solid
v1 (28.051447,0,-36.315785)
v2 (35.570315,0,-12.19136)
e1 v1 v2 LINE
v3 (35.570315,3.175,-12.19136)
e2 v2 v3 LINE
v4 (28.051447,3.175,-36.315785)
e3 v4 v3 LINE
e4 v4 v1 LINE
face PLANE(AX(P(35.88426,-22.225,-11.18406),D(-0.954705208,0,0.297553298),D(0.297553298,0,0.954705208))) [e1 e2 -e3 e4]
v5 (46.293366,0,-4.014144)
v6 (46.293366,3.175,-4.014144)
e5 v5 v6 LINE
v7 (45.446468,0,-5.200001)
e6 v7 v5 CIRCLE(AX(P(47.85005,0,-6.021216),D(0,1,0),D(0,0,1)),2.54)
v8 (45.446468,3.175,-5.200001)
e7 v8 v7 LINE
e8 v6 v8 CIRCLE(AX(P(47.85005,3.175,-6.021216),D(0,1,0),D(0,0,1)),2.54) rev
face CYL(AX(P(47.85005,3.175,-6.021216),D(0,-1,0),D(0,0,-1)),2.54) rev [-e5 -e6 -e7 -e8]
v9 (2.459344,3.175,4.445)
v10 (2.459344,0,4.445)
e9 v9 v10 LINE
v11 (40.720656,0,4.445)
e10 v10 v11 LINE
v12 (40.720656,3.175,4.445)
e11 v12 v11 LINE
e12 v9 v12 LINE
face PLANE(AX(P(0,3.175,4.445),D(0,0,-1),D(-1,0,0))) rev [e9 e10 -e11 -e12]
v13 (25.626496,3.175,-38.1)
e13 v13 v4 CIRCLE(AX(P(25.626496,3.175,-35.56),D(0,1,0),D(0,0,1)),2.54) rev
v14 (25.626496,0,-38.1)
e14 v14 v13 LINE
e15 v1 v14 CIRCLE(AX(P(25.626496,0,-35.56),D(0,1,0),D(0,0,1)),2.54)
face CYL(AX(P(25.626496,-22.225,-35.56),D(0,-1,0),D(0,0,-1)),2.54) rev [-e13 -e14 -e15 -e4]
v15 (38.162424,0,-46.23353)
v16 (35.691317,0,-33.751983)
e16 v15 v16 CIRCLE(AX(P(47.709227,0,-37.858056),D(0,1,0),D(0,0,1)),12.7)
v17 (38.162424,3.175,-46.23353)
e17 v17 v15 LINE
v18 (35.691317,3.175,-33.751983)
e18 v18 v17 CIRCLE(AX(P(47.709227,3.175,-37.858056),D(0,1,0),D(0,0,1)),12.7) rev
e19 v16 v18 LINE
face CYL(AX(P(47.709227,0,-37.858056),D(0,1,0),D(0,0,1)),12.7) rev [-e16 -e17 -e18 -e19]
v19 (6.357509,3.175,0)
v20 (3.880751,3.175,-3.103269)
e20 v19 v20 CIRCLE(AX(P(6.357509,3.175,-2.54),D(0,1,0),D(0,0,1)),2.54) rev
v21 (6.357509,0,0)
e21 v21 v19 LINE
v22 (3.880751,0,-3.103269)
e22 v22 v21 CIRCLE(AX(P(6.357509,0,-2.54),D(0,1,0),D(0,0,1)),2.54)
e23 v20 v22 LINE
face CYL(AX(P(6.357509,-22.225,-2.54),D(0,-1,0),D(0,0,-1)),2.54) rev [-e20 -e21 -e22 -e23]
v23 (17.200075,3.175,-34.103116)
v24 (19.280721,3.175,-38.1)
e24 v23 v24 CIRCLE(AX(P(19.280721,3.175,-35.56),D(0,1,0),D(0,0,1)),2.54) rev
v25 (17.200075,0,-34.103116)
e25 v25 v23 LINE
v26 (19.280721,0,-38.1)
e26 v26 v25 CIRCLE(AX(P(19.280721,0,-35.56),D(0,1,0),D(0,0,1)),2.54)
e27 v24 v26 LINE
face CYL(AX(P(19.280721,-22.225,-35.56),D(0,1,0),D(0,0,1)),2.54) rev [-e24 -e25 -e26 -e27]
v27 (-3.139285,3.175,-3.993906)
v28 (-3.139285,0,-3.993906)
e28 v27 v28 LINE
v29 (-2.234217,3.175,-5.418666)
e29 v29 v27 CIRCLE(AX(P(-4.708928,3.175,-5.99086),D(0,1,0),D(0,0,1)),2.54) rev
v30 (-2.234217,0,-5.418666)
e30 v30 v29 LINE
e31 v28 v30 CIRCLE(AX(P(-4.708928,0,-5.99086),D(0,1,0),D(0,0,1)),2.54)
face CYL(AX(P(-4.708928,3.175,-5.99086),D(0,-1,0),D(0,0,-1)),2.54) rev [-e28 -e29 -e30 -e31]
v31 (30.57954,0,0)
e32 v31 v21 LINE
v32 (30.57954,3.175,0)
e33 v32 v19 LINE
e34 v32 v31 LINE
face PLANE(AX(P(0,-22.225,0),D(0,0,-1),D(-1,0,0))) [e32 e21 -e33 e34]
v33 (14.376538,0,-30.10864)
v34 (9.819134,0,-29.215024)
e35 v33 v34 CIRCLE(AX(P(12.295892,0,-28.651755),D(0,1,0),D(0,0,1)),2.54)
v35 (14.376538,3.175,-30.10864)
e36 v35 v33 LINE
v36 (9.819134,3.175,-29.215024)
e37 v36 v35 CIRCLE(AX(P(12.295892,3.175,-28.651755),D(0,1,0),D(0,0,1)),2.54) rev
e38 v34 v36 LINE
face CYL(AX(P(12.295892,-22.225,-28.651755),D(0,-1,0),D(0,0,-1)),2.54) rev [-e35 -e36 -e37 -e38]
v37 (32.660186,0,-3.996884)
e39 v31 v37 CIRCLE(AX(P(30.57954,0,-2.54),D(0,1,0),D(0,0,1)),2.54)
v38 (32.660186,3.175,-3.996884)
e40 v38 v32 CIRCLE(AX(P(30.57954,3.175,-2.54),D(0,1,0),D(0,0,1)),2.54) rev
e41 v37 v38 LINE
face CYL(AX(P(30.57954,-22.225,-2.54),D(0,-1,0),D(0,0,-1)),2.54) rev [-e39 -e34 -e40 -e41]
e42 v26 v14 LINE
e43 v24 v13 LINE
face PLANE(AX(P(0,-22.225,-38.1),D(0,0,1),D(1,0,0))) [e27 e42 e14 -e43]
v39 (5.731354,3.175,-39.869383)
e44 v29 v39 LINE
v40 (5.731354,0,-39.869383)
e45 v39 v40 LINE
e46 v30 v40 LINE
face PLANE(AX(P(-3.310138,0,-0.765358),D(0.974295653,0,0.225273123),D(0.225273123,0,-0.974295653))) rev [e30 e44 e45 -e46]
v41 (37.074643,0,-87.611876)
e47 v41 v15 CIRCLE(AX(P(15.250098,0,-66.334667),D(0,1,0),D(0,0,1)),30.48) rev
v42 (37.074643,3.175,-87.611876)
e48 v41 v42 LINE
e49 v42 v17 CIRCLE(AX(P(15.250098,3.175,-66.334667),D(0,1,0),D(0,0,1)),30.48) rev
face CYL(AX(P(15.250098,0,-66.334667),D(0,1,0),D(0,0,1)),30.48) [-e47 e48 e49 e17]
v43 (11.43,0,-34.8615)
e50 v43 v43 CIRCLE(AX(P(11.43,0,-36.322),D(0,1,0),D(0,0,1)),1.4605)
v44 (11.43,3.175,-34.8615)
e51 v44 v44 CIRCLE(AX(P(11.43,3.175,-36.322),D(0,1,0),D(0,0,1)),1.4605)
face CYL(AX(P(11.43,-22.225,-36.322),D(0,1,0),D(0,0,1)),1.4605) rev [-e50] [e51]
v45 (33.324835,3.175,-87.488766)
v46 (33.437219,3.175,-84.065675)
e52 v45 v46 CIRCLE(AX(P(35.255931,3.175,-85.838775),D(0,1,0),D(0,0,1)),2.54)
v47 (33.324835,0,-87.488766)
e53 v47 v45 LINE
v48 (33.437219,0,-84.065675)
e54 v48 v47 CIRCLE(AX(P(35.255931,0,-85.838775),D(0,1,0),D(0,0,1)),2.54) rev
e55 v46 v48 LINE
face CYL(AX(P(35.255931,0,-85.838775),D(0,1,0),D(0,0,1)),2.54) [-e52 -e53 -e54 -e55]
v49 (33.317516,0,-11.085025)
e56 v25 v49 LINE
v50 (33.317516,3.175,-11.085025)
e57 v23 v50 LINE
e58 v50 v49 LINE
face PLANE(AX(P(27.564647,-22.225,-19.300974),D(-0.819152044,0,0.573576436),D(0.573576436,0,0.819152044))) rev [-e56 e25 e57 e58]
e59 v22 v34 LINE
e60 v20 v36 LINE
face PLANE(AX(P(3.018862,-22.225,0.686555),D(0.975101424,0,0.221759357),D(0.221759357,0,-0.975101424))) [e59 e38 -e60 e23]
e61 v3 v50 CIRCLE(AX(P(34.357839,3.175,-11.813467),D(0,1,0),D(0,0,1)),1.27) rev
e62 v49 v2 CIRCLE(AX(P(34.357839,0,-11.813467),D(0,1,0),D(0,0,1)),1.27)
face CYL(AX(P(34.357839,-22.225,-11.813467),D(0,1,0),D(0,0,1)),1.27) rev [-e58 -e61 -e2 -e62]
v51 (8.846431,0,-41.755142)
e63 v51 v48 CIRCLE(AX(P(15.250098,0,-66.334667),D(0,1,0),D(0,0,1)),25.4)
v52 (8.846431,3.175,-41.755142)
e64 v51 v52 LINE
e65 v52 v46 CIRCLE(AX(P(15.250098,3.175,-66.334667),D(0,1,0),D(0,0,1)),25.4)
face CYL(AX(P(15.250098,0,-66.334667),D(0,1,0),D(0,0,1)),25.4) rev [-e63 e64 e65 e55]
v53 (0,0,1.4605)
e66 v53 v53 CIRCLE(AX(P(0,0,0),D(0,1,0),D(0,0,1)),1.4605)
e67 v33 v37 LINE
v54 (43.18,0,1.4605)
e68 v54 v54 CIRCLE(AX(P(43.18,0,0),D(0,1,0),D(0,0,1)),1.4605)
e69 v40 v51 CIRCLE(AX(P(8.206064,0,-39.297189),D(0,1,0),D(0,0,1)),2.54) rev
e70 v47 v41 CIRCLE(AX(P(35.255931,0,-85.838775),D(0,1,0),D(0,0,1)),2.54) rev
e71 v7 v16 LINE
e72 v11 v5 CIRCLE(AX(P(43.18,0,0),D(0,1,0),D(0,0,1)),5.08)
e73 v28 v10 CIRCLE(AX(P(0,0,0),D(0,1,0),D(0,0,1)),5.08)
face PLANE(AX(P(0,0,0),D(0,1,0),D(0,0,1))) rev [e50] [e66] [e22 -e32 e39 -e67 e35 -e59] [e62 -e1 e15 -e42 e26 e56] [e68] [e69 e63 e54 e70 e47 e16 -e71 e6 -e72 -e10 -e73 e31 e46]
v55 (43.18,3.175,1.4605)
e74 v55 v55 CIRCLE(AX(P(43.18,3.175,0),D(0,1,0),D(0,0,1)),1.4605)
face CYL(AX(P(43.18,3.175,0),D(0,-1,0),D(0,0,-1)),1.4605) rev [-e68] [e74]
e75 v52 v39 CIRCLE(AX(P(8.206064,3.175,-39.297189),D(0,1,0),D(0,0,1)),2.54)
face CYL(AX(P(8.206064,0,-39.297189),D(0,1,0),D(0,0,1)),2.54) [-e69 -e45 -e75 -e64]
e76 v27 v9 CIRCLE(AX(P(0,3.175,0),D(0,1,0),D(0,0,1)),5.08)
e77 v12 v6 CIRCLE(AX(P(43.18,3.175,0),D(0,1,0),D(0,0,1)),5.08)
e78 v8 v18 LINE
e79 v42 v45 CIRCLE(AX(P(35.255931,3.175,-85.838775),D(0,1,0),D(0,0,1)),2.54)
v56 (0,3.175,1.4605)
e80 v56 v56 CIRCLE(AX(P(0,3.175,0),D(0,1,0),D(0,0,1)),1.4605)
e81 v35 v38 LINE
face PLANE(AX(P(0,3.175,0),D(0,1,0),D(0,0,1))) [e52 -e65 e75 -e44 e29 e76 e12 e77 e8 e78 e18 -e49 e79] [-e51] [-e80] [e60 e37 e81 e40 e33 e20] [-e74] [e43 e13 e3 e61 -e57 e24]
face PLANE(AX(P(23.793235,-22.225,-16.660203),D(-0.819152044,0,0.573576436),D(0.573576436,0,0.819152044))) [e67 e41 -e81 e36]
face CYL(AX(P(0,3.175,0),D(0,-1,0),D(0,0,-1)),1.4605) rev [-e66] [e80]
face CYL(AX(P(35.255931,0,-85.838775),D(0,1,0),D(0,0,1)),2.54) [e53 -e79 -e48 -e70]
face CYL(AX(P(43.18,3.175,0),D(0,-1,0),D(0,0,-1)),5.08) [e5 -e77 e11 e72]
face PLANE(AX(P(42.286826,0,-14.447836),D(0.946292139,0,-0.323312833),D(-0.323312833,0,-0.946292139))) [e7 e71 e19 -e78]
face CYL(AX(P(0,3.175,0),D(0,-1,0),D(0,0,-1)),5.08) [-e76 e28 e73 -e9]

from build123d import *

# Parameters (mm, degrees)
SKETCH1_R           = 5.08
SKETCH1_R_2         = 1.4605
BOSS_EXTRUDE1_DEPTH = 3.175
BOSS_EXTRUDE3_START = -3.175
BOSS_EXTRUDE3_DEPTH = 3.175
CUT_EXTRUDE1_DEPTH  = 25.4
FILLET4_R           = 2.54
FILLET5_R           = 12.7
FILLET6_R           = 2.54
FILLET7_R           = 1.27
SKETCH5_R           = 1.4605
CUT_EXTRUDE2_DEPTH  = 25.4


with BuildPart() as part:
    # Sketch1 → Boss-Extrude1 (new body)
    # profile 1 of 3: a face of its own
    with BuildSketch(Plane(origin=(0, 0, 0), x_dir=(1, 0, 0), z_dir=(0, 1, 0))):
        Circle(SKETCH1_R)
        with Locations(Location((0, 0, 0), (0, 0, 270))):
            Circle(SKETCH1_R_2, mode=Mode.SUBTRACT)
    # profile 2 of 3: a face of its own
    with BuildSketch(Plane(origin=(0, 0, 0), x_dir=(1, 0, 0), z_dir=(0, 1, 0))):
        with BuildLine():
            Line((40.720655575, 4.445), (2.459344425, 4.445))
            ThreePointArc((2.459344425, 4.445), (4.376063852, 2.580012628), (5.08, 0))
            ThreePointArc((5.08, 0), (4.376063852, -2.580012628), (2.459344425, -4.445))
            Line((2.459344425, -4.445), (40.720655575, -4.445))
            ThreePointArc((40.720655575, -4.445), (38.1, 0), (40.720655575, 4.445))
        make_face()
    # profile 3 of 3: a face of its own
    with BuildSketch(Plane(origin=(0, 0, 0), x_dir=(1, 0, 0), z_dir=(0, 1, 0))):
        with Locations((43.18, 0)):
            Circle(SKETCH1_R)
        with Locations(Location((43.18, 0, 0), (0, 0, 270))):
            Circle(SKETCH1_R_2, mode=Mode.SUBTRACT)
    extrude(amount=BOSS_EXTRUDE1_DEPTH)

    # Sketch3 → Boss-Extrude3 (add)
    with BuildSketch(Plane(origin=(0, 3.175, 0), x_dir=(1, 0, 0), z_dir=(0, 1, 0)).offset(BOSS_EXTRUDE3_START)):
        with BuildLine():
            Line((35.04998037, 89.507820887), (31.75, 85.645628562))
            ThreePointArc((31.75, 85.645628562), (37.132860765, 53.438748965), (6.35, 42.545))
            Line((6.35, 42.545), (-2.459344425, 4.445))
            ThreePointArc((-2.459344425, 4.445), (0, 5.08), (2.459344425, 4.445))
            Line((2.459344425, 4.445), (35.640655575, 4.445))
            Line((35.640655575, 4.445), (40.720655575, 4.445))
            ThreePointArc((40.720655575, 4.445), (43.226324552, 5.079788779), (45.72, 4.399409051))
            Line((45.72, 4.399409051), (33.02, 41.570560083))
            ThreePointArc((33.02, 41.570560083), (45.702805946, 65.04509807), (35.04998037, 89.507820887))
        make_face()
    extrude(amount=BOSS_EXTRUDE3_DEPTH)

    # Sketch4 → Cut-Extrude1 (cut)
    with BuildSketch(Plane(origin=(0, 3.175, 0), x_dir=(1, 0, 0), z_dir=(0, 1, 0))):
        Polygon((14.401426857, 38.1), (37.998834682, 4.399409051), (27.495360016, 38.1), align=None)
        Polygon((3.175, 0), (35.458834682, 0), (11.089851742, 34.802514411), align=None)
    extrude(amount=-CUT_EXTRUDE1_DEPTH, mode=Mode.SUBTRACT)

    # Fillet4
    fillet4_edges = [part.edges().sort_by_distance(p)[0] for p in [
        (11.089851742, 1.5875, -34.802514411),
        (35.458834682, 1.5875, 0),
        (3.175, 1.5875, 0),
        (14.401426857, 1.5875, -38.1),
        (27.495360016, 1.5875, -38.1),
    ]]
    fillet(fillet4_edges, radius=FILLET4_R)

    # Fillet5
    fillet5_edges = [part.edges().sort_by_distance(p)[0] for p in [
        (33.02, 1.5875, -41.570560083),
    ]]
    fillet(fillet5_edges, radius=FILLET5_R)

    # Fillet6
    fillet6_edges = [part.edges().sort_by_distance(p)[0] for p in [
        (6.35, 1.5875, -42.545),
        (35.04998037, 1.5875, -89.507820887),
        (31.75, 1.5875, -85.645628562),
        (-2.459344425, 1.5875, -4.445),
        (45.72, 1.5875, -4.399409051),
    ]]
    fillet(fillet6_edges, radius=FILLET6_R - 0.0001)  # a hair under: the kernel refuses the full size

    # Fillet7
    fillet7_edges = [part.edges().sort_by_distance(p)[0] for p in [
        (37.998834682, 1.5875, -4.399409051),
    ]]
    fillet(fillet7_edges, radius=FILLET7_R)

    # Sketch5 → Cut-Extrude2 (cut)
    with BuildSketch(Plane(origin=(0, 3.175, 0), x_dir=(1, 0, 0), z_dir=(0, 1, 0))):
        with Locations(Location((11.43, 36.322, 0), (0, 0, 270))):
            Circle(SKETCH5_R)
    extrude(amount=-CUT_EXTRUDE2_DEPTH, mode=Mode.SUBTRACT)


solid = part.part
